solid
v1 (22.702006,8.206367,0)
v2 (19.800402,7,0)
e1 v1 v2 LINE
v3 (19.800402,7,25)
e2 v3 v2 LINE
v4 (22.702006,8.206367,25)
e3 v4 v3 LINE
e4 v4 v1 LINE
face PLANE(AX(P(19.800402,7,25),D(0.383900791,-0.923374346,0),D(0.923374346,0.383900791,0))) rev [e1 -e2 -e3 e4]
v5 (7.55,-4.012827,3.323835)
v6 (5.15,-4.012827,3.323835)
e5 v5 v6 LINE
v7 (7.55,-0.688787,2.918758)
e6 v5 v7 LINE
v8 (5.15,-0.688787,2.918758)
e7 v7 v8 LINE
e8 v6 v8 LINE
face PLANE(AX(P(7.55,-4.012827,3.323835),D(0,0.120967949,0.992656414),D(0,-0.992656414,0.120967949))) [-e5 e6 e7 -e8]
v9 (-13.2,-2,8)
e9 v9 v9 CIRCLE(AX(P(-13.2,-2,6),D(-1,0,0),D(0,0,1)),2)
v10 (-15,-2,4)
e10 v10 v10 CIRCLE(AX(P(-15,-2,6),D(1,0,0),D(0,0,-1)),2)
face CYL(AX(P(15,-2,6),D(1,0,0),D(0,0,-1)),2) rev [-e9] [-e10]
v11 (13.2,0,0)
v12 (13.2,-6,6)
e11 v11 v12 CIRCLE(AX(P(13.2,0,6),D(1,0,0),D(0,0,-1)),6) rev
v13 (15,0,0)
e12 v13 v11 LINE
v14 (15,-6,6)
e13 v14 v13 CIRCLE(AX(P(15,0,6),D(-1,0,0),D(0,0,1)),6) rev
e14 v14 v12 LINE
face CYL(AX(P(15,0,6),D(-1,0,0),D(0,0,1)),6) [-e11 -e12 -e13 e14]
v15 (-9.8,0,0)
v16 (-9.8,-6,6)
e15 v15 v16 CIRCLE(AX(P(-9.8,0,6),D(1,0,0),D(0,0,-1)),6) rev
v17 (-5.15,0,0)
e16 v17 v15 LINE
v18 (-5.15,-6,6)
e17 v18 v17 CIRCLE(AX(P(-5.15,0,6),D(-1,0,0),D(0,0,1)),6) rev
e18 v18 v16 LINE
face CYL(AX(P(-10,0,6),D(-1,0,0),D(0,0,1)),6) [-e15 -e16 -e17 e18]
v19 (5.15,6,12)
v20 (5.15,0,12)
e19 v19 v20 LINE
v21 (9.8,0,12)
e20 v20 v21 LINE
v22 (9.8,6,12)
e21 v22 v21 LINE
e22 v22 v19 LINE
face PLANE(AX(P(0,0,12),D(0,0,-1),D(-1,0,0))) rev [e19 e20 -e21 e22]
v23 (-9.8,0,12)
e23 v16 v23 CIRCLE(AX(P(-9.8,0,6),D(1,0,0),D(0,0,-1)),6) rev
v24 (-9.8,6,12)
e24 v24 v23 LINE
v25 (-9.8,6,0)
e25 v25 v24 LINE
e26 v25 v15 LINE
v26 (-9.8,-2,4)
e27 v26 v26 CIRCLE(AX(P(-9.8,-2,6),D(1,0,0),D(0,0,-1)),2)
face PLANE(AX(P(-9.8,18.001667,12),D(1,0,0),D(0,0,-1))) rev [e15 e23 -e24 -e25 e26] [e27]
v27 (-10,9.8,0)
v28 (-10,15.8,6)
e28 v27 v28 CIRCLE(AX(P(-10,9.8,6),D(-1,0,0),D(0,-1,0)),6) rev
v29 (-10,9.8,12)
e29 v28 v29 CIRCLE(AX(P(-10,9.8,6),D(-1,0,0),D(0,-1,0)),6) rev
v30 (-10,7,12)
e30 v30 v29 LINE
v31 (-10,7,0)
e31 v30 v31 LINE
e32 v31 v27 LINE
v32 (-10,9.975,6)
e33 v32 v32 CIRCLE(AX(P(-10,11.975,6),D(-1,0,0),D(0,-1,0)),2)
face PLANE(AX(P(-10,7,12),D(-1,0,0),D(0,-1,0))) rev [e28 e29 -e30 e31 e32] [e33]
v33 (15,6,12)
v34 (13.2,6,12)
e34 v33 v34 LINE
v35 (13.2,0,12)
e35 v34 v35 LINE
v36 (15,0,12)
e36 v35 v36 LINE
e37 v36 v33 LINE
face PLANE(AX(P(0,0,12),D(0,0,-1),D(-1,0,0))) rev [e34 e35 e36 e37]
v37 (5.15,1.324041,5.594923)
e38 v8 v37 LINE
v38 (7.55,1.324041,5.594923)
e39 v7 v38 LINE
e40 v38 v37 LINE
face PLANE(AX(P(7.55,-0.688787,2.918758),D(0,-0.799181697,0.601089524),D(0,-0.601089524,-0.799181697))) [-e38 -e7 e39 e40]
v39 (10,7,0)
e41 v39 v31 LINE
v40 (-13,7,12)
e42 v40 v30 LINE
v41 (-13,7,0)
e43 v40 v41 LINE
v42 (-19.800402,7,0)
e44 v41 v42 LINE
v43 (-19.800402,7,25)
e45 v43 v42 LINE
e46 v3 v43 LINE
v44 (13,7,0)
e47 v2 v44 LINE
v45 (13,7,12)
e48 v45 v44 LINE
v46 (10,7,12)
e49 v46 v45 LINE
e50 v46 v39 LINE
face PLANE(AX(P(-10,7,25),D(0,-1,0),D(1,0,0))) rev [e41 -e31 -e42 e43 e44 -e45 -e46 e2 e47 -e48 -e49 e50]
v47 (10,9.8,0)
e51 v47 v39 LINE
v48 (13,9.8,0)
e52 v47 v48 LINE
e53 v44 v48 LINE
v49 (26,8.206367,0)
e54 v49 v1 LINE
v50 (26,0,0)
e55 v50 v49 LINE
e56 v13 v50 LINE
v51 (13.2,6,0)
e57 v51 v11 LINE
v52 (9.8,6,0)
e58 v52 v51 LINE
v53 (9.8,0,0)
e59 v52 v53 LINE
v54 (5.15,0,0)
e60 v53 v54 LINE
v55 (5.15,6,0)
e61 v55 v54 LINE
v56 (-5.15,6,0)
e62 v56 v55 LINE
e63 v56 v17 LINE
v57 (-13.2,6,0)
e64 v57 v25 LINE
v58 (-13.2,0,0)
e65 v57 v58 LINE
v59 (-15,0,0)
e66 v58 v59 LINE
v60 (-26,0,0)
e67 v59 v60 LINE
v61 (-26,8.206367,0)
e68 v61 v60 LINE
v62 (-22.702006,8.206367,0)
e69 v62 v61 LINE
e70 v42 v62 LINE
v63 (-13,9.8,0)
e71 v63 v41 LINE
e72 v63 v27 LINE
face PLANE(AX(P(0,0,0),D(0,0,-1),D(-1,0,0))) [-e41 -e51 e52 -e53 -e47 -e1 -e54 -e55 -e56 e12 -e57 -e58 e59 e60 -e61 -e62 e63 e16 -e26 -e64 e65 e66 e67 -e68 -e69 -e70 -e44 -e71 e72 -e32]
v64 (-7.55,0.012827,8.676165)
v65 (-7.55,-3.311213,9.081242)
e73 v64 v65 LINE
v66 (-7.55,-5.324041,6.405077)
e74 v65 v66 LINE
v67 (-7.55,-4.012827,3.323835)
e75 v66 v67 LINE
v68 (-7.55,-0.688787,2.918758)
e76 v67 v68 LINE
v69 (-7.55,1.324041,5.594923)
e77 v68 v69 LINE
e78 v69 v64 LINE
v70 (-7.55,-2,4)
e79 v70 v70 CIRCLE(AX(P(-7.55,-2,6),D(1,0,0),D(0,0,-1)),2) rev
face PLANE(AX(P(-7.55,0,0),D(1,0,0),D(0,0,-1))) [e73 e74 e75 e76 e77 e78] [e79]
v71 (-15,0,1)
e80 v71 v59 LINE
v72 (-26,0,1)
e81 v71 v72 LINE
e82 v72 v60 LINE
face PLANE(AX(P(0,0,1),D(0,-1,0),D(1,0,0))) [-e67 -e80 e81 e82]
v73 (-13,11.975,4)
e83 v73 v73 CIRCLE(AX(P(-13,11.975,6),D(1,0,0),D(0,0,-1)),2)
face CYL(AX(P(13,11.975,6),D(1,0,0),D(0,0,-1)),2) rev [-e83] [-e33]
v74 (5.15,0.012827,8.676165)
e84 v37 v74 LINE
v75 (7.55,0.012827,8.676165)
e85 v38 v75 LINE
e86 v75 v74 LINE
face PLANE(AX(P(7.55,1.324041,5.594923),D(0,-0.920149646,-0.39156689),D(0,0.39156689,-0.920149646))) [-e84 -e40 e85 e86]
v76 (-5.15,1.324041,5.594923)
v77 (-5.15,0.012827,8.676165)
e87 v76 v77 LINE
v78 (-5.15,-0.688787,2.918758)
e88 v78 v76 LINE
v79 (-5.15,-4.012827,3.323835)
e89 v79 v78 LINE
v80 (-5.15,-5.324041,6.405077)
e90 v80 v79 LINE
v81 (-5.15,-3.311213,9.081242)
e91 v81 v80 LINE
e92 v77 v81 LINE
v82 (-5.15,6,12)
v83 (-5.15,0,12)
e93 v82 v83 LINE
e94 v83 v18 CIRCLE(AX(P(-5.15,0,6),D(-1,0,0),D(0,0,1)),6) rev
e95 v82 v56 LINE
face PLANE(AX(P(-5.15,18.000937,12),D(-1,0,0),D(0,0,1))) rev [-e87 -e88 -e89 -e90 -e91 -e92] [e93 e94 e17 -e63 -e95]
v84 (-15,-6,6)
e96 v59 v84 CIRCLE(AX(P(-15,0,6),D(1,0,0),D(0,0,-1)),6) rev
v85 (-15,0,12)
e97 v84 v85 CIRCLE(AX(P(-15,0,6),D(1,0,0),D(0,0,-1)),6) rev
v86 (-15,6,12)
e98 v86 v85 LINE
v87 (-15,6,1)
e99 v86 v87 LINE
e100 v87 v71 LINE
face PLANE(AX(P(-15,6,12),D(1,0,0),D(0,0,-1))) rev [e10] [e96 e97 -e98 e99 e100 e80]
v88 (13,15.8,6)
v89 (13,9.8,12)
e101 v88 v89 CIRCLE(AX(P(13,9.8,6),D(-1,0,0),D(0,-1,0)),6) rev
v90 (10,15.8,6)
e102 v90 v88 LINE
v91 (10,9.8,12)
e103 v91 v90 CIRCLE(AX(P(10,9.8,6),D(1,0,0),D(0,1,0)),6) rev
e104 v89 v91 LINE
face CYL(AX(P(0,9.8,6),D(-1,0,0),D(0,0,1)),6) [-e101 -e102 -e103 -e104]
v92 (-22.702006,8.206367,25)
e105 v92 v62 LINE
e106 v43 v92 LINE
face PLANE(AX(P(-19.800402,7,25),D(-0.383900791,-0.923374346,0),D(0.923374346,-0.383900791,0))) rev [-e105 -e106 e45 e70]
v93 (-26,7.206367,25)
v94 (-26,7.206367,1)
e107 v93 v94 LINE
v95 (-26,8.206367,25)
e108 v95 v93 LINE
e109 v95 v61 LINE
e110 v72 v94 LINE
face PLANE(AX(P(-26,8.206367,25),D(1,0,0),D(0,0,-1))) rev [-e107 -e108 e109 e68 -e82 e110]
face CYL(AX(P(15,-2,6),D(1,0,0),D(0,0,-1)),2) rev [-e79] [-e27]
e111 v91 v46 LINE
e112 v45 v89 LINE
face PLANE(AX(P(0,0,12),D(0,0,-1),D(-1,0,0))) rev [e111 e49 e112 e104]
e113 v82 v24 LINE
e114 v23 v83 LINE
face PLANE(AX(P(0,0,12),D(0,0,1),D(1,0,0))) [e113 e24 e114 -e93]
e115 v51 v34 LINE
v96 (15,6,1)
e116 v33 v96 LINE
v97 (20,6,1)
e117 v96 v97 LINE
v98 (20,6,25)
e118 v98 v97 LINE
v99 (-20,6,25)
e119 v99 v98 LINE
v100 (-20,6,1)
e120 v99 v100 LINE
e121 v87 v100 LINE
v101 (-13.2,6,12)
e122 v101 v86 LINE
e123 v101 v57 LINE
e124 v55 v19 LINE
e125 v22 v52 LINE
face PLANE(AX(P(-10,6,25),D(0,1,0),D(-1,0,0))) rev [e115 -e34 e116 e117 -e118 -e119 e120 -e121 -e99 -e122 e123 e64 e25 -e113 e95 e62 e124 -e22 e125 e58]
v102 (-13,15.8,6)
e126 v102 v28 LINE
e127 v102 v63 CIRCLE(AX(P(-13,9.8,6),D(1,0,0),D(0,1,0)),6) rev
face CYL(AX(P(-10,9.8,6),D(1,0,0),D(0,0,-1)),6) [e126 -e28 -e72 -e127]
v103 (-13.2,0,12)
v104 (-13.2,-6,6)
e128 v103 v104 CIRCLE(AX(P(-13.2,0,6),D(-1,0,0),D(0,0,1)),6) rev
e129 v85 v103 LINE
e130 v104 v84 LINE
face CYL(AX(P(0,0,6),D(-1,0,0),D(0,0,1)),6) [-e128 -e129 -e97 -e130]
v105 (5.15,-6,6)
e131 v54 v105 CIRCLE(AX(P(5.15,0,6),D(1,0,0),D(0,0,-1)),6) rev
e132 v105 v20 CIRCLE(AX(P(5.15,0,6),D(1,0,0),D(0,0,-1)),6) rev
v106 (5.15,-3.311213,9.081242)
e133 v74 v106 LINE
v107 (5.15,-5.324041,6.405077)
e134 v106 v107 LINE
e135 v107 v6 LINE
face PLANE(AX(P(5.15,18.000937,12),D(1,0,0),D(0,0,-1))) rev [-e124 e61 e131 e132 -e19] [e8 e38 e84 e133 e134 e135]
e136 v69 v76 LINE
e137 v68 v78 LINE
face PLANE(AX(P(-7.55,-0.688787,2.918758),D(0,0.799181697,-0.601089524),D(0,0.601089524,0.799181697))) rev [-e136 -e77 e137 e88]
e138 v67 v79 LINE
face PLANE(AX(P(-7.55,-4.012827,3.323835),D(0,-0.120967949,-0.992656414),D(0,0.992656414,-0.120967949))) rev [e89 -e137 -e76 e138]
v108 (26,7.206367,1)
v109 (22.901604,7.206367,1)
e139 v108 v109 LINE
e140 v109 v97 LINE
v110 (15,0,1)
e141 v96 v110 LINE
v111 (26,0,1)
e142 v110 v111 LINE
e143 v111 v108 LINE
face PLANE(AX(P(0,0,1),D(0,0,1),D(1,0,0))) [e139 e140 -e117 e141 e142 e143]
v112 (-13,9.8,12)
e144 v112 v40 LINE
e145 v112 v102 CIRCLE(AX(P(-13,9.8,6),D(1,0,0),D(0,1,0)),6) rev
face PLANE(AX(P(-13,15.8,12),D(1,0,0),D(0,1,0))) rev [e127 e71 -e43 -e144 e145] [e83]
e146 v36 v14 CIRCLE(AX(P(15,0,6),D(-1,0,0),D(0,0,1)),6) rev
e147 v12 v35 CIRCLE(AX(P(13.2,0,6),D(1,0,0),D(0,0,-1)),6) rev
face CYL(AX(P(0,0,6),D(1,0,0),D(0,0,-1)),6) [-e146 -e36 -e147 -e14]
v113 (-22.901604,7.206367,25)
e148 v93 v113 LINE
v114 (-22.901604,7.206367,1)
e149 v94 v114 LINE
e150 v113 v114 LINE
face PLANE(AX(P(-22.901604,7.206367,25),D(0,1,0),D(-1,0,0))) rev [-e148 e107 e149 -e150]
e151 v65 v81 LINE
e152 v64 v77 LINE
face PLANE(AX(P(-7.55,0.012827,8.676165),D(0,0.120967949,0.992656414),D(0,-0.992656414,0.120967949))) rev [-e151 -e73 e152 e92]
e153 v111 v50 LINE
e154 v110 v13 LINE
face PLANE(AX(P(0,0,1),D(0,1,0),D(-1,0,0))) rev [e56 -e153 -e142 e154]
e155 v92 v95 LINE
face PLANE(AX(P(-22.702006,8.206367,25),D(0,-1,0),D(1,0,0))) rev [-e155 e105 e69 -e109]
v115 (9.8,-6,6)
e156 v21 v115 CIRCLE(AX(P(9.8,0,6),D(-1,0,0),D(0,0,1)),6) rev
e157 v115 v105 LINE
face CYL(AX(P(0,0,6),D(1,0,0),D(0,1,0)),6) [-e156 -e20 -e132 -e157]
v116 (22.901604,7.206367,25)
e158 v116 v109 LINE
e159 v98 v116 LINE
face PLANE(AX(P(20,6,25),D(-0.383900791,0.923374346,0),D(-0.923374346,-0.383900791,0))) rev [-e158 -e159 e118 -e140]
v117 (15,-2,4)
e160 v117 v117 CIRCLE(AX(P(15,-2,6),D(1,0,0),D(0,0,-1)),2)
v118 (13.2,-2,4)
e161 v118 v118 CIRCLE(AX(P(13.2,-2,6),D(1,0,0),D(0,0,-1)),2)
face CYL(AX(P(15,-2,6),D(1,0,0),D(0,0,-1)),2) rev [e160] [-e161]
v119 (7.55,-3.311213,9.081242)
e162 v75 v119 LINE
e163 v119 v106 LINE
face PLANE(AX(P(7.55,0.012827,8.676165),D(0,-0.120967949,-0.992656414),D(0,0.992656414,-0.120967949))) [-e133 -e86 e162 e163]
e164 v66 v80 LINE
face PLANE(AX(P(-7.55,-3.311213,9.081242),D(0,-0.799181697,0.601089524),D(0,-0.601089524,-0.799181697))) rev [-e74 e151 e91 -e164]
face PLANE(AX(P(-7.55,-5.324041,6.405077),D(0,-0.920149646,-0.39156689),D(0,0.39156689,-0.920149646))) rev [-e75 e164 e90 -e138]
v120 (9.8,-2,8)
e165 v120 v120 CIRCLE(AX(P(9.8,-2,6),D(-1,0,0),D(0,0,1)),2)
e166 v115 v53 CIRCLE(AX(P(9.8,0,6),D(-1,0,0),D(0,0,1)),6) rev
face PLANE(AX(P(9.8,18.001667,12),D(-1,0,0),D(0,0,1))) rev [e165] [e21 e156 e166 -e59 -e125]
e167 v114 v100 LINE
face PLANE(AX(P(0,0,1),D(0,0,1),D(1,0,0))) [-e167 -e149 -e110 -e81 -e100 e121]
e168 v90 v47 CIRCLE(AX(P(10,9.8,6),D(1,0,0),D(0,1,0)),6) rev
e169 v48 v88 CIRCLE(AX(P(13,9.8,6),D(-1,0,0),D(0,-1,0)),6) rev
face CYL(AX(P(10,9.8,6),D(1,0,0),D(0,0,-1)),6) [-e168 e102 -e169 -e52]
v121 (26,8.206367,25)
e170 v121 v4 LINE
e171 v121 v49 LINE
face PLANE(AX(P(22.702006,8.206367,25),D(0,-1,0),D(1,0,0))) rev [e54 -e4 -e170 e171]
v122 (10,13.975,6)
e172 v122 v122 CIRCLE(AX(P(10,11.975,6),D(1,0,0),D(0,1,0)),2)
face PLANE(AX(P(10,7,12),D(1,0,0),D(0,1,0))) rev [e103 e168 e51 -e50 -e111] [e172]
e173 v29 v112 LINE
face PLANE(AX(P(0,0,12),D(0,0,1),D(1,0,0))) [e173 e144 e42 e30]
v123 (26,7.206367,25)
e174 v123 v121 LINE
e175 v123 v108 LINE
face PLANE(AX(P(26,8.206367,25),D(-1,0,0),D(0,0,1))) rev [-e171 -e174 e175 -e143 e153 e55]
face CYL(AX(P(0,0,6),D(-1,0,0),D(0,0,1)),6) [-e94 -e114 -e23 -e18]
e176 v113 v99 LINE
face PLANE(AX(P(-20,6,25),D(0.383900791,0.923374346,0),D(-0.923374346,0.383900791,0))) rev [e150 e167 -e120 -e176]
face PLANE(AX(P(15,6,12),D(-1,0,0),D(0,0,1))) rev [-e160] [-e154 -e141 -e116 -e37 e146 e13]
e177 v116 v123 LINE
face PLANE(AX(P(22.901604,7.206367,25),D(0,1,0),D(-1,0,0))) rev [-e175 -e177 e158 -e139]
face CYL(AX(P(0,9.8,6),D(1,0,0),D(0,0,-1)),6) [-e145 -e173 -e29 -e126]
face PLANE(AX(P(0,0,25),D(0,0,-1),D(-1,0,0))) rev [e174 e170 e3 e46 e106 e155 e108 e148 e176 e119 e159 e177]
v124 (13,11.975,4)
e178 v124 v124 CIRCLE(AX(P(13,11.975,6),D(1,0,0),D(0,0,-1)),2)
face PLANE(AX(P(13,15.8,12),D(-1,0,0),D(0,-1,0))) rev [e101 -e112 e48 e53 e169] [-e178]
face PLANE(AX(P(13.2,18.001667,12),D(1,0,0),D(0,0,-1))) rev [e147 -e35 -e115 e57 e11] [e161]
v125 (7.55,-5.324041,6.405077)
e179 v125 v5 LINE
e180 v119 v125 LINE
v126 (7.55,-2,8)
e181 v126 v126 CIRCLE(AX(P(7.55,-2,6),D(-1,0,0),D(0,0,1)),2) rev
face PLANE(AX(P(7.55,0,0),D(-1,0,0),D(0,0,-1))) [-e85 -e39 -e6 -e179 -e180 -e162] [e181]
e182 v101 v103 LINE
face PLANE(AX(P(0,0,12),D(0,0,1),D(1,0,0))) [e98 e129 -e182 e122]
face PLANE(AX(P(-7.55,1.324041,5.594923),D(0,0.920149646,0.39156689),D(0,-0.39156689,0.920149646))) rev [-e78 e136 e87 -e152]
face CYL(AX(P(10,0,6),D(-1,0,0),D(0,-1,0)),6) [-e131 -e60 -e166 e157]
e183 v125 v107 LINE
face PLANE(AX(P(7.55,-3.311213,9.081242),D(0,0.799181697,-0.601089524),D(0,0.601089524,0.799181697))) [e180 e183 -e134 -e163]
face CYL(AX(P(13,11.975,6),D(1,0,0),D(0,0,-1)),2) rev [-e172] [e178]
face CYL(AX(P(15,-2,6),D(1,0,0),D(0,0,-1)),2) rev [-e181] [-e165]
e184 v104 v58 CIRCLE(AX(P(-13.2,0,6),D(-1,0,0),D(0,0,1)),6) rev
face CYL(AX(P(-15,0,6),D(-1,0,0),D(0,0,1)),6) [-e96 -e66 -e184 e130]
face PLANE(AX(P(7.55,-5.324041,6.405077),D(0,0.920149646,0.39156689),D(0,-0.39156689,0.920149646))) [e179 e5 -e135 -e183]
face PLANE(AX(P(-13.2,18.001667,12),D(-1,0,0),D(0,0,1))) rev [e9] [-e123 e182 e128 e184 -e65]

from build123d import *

# Parameters (mm, degrees)
SKETCH2_W                 = 5
SKETCH2_H                 = 12
BOSS_EXTRUDE1_DEPTH       = 12
BOSS_EXTRUDE1_2_DEPTH     = 12
BOSS_EXTRUDE3_DEPTH       = 25
SKETCH5_W                 = 3
SKETCH5_H                 = 8.8
BOSS_EXTRUDE4_DEPTH       = 12
SKETCH7_W                 = 2
SKETCH7_H                 = 12
BOSS_EXTRUDE5_DEPTH       = 12
SKETCH15_W                = 0.2
SKETCH15_H                = 12
CUT_EXTRUDE2_DEPTH        = 12
SKETCH16_W                = 0.15
SKETCH16_H                = 12
CUT_EXTRUDE3_DEPTH        = 12
FILLET1_R                 = 6
F_4_0MM_DOWEL_HOLE2_D     = 4
FILLET2_R                 = 6
F_4_0MM_DOWEL_HOLE1_D     = 4
F_4_0MM_DOWEL_HOLE1_DEPTH = 26
F_4_0MM_DOWEL_HOLE1_TIP   = 1.201721238
BOSS_EXTRUDE6_DEPTH       = 1
CUT_EXTRUDE4_DEPTH        = 2.4


with BuildPart() as part:
    # Sketch2 → Boss-Extrude1 (new body)
    with BuildSketch(Plane.XY):
        with Locations((-7.5, 0)):
            Rectangle(SKETCH2_W, SKETCH2_H)
    extrude(amount=BOSS_EXTRUDE1_DEPTH)



with BuildPart() as body_2:
    # Sketch2 → Boss-Extrude1 2 (new body)
    with BuildSketch(Plane.XY):
        with Locations((7.5, 0)):
            Rectangle(SKETCH2_W, SKETCH2_H)
    extrude(amount=BOSS_EXTRUDE1_2_DEPTH)


with BuildPart() as part_1:
    add(part.part)

    add(body_2.part)  # Boss-Extrude3 merges body 2
    # Sketch4 → Boss-Extrude3 (add)
    with BuildSketch(Plane.XY):
        Polygon((-10, 6), (-20, 6), (-22.901603942, 7.206366686), (-26, 7.206366686), (-26, 8.206366686), (-22.7020064, 8.206366686), (-19.800402458, 7), (-10, 7), (10, 7), (19.800402458, 7), (22.7020064, 8.206366686), (26, 8.206366686), (26, 7.206366686), (22.901603942, 7.206366686), (20, 6), (10, 6), align=None)
    extrude(amount=BOSS_EXTRUDE3_DEPTH)

    # Sketch5 → Boss-Extrude4 (add)
    with BuildSketch(Plane.XY):
        with Locations((-11.5, 11.4)):
            Rectangle(SKETCH5_W, SKETCH5_H)
        with Locations((11.5, 11.4)):
            Rectangle(SKETCH5_W, SKETCH5_H)
    extrude(amount=BOSS_EXTRUDE4_DEPTH)

    # Sketch7 → Boss-Extrude5 (add)
    with BuildSketch(Plane.XY):
        with Locations((-14, 0)):
            Rectangle(SKETCH7_W, SKETCH7_H)
        with Locations((14, 0)):
            Rectangle(SKETCH7_W, SKETCH7_H)
    extrude(amount=BOSS_EXTRUDE5_DEPTH)

    # Sketch15 → Cut-Extrude2 (cut)
    with BuildSketch(Plane.XZ.offset(6)):
        with Locations((-9.9, 6)):
            Rectangle(SKETCH15_W, SKETCH15_H)
        with Locations((9.9, 6)):
            Rectangle(SKETCH15_W, SKETCH15_H)
        with Locations((-13.1, 6)):
            Rectangle(SKETCH15_W, SKETCH15_H)
        with Locations((13.1, 6)):
            Rectangle(SKETCH15_W, SKETCH15_H)
    extrude(amount=-CUT_EXTRUDE2_DEPTH, mode=Mode.SUBTRACT)

    # Sketch16 → Cut-Extrude3 (cut)
    with BuildSketch(Plane.XZ.offset(6)):
        with Locations((-5.075, 6)):
            Rectangle(SKETCH16_W, SKETCH16_H)
        with Locations((5.075, 6)):
            Rectangle(SKETCH16_W, SKETCH16_H)
    extrude(amount=-CUT_EXTRUDE3_DEPTH, mode=Mode.SUBTRACT)

    # Fillet1
    fillet1_edges = [part_1.edges().sort_by_distance(p)[0] for p in [
        (7.475, -6, 0),
        (7.475, -6, 12),
        (-7.475, -6, 0),
        (-7.475, -6, 12),
        (-14.1, -6, 0),
        (-14.1, -6, 12),
        (14.1, -6, 12),
        (14.1, -6, 0),
    ]]
    fillet(fillet1_edges, radius=FILLET1_R - 0.0001)  # a hair under: the kernel refuses the full size

    # Ø4.0mm Dowel Hole2 (through all)
    with Locations(Plane(origin=(15, 0, 0), x_dir=(0, 0, -1), z_dir=(1, 0, 0))):
        with Locations((-6, -2)):
            Hole(F_4_0MM_DOWEL_HOLE2_D / 2)

    # Fillet2
    fillet2_edges = [part_1.edges().sort_by_distance(p)[0] for p in [
        (-11.5, 15.8, 0),
        (-11.5, 15.8, 12),
        (11.5, 15.8, 0),
        (11.5, 15.8, 12),
    ]]
    fillet(fillet2_edges, radius=FILLET2_R - 0.0001)  # a hair under: the kernel refuses the full size

    # Ø4.0mm Dowel Hole1
    with Locations(Plane(origin=(13, 0, 0), x_dir=(0, 0, -1), z_dir=(1, 0, 0))):
        with Locations((-6, 11.975)):
            Hole(F_4_0MM_DOWEL_HOLE1_D / 2, depth=F_4_0MM_DOWEL_HOLE1_DEPTH)
            with Locations((0, 0, -(F_4_0MM_DOWEL_HOLE1_DEPTH + F_4_0MM_DOWEL_HOLE1_TIP / 2))):  # 118° drill point
                Cone(0, F_4_0MM_DOWEL_HOLE1_D / 2, F_4_0MM_DOWEL_HOLE1_TIP, mode=Mode.SUBTRACT)

    # Sketch14 → Boss-Extrude6 (add)
    with BuildSketch(Plane.XY):
        Polygon((-22.901603942, 7.206366686), (-26, 7.206366686), (-26, 0), (-15, 0), (-15, 6), (-20, 6), align=None)
        Polygon((20, 6), (15, 6), (15, 0), (26, 0), (26, 7.206366686), (22.901603942, 7.206366686), align=None)
    extrude(amount=BOSS_EXTRUDE6_DEPTH)

    # Sketch18 → Cut-Extrude4 (cut)
    with BuildSketch(Plane(origin=(-5.15, 0, 0), x_dir=(0, 0, -1), z_dir=(1, 0, 0))):
        Polygon((-2.918757855, -0.688786755), (-5.594922908, 1.324040596), (-8.676165053, 0.01282735), (-9.081242145, -3.311213245), (-6.405077092, -5.324040596), (-3.323834947, -4.01282735), align=None)
    cut_extrude4 = extrude(amount=-CUT_EXTRUDE4_DEPTH, mode=Mode.SUBTRACT)

    # Mirror1: Cut-Extrude4 across plane
    add(cut_extrude4.mirror(Plane(origin=(0, 0, 0), x_dir=(0, 0, 1), z_dir=(1, 0, 0))), mode=Mode.SUBTRACT)


solid = part_1.part
